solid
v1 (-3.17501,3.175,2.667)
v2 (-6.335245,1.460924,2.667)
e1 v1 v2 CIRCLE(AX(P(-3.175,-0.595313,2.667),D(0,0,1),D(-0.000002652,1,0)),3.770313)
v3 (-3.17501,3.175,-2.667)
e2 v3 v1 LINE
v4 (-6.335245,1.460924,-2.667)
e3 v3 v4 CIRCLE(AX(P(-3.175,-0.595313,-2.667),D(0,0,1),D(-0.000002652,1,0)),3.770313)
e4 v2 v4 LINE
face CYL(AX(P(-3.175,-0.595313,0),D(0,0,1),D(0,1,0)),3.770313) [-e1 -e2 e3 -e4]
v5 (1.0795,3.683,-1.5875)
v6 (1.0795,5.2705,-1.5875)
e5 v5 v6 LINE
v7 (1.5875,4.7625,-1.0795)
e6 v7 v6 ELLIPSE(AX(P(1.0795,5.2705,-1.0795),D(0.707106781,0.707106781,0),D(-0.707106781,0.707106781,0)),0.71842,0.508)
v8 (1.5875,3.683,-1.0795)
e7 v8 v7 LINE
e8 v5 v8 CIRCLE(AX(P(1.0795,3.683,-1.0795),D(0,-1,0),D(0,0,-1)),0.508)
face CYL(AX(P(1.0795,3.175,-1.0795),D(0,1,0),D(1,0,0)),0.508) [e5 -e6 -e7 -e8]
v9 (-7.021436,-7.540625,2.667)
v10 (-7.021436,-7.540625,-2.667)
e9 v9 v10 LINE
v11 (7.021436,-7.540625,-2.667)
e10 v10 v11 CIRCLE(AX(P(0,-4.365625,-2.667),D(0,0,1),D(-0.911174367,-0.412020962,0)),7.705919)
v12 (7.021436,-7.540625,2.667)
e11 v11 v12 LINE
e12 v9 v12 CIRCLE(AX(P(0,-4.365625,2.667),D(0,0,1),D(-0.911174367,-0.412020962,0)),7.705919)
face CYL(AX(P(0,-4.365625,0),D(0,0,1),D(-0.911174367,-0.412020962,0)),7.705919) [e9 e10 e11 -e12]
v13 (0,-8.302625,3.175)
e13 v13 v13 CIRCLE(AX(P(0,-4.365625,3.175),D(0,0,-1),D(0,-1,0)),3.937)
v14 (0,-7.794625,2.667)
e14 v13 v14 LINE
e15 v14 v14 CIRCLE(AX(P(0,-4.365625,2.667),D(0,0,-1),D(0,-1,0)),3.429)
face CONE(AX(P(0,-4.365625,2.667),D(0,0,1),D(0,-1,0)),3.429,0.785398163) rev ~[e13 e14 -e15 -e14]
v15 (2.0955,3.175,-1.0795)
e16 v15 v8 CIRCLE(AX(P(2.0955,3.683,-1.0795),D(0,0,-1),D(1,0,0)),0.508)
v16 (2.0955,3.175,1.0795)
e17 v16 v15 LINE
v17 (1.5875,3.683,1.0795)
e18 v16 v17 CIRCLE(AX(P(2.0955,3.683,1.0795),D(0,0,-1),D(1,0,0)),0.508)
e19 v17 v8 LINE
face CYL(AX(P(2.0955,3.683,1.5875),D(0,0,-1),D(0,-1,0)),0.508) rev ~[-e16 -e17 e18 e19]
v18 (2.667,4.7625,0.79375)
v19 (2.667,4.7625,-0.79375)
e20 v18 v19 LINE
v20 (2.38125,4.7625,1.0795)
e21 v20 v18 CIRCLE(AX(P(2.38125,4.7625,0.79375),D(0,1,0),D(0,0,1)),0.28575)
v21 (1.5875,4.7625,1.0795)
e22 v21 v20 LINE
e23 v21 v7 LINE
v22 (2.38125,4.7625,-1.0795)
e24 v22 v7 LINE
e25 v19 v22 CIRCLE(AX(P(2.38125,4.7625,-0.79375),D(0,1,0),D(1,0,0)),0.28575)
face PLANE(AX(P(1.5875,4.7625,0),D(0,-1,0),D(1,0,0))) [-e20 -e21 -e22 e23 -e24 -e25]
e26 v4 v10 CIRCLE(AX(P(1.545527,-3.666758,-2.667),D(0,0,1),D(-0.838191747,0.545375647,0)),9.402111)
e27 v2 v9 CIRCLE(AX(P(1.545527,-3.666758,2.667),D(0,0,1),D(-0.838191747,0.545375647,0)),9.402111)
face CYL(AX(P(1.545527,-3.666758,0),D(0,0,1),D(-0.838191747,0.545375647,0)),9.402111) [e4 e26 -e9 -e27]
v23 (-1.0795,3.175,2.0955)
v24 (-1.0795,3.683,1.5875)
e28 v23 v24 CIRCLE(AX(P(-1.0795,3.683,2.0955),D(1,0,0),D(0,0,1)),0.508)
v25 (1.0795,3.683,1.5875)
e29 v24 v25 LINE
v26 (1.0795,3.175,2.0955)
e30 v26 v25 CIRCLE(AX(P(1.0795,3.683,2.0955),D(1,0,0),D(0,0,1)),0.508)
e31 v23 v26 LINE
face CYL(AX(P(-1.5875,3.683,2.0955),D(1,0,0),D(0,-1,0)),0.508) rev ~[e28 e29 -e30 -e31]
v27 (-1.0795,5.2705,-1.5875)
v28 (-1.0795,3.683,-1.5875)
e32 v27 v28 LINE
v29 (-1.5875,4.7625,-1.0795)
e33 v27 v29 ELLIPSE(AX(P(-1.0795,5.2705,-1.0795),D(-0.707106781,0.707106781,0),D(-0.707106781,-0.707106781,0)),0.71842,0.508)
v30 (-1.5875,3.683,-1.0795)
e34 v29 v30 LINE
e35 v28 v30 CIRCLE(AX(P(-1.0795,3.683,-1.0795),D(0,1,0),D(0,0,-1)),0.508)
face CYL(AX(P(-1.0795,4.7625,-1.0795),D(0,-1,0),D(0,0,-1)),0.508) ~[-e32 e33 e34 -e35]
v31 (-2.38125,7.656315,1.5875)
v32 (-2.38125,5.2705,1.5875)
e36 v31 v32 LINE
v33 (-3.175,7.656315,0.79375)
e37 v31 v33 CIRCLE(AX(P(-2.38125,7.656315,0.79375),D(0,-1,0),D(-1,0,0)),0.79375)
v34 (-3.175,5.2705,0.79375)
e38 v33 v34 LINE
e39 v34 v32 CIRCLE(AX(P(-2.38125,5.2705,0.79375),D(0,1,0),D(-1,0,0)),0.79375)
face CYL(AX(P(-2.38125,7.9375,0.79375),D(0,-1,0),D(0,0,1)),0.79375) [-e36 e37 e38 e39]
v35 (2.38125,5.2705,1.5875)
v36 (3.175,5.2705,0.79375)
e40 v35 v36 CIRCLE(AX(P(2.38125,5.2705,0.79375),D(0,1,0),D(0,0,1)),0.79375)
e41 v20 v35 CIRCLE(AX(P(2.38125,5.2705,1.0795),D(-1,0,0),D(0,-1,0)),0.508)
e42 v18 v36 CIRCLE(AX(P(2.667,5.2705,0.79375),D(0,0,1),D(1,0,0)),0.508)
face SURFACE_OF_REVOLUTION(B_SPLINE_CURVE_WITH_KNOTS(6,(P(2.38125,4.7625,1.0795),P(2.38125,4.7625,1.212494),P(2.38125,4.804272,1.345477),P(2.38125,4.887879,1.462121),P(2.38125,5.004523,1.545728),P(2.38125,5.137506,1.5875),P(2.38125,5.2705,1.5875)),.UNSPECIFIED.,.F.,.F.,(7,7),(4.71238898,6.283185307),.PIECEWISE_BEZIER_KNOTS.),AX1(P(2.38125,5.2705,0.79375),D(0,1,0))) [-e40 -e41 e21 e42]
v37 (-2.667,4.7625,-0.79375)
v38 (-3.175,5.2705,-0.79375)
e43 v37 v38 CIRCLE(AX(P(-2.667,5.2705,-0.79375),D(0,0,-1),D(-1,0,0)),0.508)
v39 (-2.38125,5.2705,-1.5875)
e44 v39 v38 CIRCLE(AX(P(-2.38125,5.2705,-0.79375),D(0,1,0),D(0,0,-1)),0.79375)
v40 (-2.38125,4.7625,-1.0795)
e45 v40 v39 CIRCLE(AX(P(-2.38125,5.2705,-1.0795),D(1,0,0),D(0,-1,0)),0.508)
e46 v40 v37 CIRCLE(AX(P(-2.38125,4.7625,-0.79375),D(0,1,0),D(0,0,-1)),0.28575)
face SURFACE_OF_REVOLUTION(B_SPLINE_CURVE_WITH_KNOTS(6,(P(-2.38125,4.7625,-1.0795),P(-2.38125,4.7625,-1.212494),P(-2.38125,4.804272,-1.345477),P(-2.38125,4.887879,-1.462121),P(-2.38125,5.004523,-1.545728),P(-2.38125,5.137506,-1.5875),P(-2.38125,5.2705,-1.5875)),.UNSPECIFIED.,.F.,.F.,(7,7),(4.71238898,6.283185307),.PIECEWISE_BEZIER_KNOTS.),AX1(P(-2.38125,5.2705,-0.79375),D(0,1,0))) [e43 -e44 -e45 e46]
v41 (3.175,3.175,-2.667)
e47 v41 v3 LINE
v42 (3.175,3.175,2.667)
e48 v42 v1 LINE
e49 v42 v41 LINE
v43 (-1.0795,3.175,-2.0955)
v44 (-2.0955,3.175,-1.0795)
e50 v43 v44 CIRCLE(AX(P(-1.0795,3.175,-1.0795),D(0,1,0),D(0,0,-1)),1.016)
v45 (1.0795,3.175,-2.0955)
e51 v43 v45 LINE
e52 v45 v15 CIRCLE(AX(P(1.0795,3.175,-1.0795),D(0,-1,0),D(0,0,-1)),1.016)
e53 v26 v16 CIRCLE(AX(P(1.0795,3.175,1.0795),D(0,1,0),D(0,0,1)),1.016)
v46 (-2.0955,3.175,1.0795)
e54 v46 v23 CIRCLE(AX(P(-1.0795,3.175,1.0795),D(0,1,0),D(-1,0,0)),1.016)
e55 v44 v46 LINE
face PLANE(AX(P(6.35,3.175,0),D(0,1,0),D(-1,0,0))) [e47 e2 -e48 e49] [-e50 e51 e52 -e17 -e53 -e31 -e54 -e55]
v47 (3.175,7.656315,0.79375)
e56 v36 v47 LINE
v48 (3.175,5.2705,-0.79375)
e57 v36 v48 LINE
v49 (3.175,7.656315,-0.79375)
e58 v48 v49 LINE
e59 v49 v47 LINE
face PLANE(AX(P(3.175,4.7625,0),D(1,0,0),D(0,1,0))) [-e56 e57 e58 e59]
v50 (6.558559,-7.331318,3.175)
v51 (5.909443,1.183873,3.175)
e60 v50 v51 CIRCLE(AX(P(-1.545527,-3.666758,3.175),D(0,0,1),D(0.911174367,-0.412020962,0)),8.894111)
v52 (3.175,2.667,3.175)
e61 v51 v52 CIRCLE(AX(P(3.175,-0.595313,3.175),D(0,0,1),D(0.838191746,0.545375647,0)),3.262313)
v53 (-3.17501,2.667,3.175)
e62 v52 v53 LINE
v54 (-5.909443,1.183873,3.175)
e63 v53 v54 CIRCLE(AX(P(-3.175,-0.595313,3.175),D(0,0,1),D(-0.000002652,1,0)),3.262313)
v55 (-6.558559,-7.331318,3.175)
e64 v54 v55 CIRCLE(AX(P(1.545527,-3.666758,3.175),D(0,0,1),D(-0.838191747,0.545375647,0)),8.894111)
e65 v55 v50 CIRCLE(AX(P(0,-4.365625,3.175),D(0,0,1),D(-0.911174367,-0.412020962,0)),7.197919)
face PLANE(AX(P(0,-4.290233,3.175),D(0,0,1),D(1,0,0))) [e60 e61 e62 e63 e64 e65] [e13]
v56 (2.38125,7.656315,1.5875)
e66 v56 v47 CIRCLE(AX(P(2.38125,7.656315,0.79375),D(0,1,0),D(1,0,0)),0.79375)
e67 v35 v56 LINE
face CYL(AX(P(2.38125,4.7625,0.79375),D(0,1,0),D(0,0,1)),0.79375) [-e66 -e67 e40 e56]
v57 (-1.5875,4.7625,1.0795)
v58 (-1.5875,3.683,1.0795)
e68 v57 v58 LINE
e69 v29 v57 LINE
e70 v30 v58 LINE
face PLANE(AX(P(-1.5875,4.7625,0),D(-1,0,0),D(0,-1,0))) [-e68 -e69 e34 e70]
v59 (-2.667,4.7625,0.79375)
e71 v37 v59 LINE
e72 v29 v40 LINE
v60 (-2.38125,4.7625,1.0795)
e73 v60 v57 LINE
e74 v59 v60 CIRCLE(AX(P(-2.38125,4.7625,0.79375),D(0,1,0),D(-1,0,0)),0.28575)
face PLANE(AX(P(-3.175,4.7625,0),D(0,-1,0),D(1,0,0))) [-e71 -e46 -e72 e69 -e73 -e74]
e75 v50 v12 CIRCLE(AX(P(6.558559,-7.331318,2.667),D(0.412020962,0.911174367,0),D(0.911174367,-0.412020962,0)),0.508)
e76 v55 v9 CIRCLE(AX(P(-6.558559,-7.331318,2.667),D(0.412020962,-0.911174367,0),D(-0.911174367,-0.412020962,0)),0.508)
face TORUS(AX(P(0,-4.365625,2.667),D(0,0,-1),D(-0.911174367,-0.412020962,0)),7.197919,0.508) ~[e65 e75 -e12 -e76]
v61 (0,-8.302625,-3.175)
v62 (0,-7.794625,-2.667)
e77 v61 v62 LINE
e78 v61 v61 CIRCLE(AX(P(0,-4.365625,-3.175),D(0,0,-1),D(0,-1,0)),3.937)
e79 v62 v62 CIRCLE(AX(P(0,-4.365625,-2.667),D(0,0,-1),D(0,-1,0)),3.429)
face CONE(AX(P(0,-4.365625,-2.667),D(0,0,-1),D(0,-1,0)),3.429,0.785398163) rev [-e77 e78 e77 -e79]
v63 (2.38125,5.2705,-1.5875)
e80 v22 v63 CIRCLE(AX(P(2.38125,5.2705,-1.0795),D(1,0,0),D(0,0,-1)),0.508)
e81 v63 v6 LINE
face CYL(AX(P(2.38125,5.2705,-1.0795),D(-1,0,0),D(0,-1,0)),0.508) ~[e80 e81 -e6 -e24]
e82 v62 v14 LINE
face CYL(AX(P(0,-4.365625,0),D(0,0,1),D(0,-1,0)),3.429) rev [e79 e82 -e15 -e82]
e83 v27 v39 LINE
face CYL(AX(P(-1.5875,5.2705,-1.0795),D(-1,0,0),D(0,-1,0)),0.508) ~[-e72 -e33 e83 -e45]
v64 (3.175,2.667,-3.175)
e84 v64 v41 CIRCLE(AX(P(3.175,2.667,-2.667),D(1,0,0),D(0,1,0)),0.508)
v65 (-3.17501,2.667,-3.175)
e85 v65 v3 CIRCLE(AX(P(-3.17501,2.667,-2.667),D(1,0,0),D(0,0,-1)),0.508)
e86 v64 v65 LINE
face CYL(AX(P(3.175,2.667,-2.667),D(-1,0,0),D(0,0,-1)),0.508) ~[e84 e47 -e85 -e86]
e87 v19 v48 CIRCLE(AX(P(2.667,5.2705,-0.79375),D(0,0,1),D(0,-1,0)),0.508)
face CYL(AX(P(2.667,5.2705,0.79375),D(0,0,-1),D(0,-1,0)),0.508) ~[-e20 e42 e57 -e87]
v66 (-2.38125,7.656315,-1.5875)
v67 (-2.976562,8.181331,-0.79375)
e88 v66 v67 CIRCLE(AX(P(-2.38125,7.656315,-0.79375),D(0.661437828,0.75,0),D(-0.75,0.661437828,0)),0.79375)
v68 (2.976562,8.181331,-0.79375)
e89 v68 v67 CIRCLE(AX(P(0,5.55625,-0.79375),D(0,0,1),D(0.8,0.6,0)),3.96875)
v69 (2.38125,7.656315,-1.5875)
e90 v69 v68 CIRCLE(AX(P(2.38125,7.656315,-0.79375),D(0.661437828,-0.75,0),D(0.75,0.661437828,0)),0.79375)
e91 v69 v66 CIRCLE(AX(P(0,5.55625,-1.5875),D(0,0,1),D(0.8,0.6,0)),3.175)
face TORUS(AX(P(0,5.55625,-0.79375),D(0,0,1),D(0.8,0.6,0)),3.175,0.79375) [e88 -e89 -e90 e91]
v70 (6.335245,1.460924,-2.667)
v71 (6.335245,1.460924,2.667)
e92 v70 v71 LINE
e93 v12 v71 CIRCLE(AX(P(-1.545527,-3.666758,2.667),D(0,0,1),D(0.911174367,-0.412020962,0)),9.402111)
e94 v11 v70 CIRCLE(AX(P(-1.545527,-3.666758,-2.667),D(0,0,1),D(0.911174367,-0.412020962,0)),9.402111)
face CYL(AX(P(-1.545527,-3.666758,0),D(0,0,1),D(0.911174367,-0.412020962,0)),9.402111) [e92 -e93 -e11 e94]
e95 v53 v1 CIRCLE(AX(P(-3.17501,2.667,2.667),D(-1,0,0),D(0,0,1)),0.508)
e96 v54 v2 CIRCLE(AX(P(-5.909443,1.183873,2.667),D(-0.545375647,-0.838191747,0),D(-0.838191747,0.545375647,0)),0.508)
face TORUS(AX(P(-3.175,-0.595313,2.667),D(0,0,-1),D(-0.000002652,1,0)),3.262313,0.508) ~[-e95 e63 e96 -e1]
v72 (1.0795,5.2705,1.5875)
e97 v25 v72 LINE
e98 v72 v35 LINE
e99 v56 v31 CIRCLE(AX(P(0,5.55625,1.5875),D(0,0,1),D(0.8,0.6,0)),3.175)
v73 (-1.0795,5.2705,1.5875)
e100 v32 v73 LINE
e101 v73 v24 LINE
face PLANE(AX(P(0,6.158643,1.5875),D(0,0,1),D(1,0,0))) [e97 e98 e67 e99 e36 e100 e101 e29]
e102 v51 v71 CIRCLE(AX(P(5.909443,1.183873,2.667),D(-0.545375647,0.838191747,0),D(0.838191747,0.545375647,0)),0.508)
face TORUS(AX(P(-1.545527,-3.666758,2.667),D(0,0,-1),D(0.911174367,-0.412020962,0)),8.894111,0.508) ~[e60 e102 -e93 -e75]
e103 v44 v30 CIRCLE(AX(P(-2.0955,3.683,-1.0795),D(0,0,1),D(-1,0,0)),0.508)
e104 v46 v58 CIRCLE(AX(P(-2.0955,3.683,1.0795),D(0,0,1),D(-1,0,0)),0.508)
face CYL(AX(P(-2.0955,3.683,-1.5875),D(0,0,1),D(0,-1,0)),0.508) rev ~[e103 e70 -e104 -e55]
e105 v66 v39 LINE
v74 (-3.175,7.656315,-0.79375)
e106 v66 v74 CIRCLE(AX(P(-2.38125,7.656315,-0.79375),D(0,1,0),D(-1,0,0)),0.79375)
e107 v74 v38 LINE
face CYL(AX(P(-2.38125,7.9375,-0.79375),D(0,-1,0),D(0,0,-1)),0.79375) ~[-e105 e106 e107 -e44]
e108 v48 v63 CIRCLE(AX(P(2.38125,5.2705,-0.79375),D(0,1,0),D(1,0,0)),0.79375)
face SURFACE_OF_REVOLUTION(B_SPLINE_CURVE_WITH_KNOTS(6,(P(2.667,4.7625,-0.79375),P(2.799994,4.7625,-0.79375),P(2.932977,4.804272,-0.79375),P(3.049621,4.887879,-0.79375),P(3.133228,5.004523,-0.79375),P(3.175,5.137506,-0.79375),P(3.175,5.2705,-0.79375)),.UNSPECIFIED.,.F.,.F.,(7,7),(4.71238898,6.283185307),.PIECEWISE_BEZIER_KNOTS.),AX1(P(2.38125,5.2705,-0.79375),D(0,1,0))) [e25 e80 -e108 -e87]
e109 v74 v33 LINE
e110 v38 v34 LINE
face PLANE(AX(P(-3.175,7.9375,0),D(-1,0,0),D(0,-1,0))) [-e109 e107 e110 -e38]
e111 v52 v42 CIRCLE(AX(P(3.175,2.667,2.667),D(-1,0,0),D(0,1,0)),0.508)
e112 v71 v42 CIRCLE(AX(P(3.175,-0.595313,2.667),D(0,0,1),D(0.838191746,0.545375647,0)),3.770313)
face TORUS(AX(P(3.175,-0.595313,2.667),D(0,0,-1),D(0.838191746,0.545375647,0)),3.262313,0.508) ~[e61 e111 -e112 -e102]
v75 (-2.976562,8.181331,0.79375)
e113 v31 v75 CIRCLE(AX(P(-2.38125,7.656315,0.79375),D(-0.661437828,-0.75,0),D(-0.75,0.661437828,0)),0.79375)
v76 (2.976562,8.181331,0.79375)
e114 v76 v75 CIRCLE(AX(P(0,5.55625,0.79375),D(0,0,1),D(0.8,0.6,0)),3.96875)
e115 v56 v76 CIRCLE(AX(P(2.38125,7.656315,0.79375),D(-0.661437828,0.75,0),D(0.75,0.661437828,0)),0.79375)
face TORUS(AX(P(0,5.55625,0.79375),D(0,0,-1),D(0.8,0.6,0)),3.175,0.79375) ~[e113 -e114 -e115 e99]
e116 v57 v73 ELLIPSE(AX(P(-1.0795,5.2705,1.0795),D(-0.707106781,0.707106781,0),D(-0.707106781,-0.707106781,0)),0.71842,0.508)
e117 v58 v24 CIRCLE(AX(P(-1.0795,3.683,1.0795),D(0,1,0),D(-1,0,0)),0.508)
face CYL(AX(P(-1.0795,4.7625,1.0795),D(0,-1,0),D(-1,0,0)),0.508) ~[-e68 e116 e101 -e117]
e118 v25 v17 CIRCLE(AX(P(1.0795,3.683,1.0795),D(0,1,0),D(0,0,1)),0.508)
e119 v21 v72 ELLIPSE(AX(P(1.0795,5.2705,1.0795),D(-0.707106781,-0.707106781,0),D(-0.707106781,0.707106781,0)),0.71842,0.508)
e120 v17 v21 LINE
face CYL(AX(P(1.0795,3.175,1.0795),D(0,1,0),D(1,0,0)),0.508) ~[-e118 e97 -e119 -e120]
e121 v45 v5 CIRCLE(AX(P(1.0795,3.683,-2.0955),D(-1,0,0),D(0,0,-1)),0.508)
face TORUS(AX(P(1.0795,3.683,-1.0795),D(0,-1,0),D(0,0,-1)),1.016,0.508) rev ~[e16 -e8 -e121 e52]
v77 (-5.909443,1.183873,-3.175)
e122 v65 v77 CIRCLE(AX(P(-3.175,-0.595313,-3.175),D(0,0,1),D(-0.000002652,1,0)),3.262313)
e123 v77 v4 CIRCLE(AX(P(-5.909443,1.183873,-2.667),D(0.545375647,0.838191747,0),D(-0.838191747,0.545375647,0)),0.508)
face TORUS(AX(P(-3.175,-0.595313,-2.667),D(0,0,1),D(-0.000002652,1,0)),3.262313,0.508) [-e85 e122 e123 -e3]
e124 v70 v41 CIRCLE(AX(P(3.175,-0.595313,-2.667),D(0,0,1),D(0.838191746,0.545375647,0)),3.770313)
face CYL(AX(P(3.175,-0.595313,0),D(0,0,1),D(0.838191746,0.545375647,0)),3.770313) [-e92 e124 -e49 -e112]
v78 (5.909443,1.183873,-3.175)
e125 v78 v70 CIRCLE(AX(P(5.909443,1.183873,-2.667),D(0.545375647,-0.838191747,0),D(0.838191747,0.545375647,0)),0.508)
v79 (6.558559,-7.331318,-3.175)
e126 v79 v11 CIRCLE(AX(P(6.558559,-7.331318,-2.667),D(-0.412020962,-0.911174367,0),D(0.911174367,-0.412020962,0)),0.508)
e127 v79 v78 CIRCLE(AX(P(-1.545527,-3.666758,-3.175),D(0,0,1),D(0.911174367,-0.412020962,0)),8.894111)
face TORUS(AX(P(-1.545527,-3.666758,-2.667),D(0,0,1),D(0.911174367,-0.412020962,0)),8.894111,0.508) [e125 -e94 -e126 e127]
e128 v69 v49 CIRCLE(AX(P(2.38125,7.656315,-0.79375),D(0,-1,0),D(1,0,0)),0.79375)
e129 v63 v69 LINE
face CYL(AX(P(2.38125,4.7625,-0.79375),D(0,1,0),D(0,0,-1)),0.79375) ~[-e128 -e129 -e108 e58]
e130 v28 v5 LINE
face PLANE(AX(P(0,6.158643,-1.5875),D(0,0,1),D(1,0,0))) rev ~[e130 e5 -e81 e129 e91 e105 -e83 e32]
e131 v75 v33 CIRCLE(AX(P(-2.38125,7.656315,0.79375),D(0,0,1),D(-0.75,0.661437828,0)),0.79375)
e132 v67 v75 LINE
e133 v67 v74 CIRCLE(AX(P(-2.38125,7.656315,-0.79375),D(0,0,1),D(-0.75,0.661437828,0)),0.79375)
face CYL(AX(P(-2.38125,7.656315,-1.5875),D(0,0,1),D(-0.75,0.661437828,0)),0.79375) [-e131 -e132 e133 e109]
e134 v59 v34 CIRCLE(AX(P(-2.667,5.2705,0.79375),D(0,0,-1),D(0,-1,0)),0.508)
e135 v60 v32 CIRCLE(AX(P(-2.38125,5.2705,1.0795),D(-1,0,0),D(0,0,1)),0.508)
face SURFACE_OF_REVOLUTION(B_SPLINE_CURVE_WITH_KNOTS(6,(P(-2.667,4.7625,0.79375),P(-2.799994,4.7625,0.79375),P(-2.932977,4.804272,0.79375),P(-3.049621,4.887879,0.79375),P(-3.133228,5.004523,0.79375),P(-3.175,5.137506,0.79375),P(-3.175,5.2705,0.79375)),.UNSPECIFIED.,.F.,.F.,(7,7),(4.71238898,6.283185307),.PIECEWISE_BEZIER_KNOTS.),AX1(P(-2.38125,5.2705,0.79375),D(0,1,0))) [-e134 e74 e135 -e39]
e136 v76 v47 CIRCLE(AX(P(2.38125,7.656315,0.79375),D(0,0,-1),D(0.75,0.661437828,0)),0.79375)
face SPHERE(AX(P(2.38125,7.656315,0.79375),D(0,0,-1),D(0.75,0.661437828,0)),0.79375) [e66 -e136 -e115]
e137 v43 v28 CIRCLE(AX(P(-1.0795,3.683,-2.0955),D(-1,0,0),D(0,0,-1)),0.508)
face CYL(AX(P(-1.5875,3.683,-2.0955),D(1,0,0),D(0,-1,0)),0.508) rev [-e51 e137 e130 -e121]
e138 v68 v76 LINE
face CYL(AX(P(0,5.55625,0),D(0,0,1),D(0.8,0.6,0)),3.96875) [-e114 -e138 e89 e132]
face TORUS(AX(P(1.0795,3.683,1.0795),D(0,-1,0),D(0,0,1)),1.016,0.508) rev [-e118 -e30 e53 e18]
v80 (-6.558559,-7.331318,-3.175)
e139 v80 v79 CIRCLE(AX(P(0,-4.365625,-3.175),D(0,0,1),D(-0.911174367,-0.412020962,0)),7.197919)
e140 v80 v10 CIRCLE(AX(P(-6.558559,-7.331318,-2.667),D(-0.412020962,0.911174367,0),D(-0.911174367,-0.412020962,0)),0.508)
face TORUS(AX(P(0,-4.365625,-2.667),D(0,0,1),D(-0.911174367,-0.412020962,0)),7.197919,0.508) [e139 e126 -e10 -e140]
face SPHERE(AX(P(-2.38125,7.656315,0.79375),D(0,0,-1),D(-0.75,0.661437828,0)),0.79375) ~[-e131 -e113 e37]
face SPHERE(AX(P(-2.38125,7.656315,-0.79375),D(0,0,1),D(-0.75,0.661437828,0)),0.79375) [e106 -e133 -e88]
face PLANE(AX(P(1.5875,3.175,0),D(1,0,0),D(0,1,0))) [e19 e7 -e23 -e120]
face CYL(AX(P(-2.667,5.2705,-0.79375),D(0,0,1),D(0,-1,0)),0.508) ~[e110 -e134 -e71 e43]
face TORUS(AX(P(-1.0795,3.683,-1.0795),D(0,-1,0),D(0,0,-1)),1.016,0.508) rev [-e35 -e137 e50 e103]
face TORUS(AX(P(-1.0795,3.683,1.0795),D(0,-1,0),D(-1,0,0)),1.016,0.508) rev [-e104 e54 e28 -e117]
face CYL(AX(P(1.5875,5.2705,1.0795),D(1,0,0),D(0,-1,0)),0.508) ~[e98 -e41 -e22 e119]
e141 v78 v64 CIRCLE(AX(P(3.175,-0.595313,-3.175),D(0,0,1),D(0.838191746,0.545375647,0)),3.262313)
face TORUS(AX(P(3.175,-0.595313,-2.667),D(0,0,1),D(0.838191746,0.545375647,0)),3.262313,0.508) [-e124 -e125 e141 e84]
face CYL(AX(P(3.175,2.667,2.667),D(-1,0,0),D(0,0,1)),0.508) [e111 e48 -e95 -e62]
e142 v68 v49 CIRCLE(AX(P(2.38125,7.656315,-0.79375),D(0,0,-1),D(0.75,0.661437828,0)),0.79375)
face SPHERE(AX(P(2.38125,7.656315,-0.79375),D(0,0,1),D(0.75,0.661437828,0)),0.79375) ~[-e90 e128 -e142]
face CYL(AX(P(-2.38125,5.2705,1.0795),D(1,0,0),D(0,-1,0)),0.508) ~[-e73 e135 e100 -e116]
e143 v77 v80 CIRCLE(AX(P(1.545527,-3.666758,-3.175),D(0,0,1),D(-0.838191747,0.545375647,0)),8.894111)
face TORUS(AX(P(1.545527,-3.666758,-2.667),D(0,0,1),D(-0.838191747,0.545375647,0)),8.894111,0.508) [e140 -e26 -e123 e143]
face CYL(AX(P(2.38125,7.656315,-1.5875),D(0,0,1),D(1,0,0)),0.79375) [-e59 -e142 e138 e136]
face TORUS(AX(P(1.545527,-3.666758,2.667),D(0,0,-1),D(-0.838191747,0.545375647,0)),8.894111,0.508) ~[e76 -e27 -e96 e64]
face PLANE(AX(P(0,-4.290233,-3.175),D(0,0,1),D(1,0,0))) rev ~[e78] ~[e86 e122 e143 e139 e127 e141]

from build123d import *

# Parameters (mm, degrees)
F1_DEPTH = 1.5875
F2_DEPTH = 3.175
F3_R     = 3.17499
F4_R     = 0.79375
F6_DEPTH = 3.175
F7_R     = 0.508
F8_R     = 0.508
F9_SIZE  = 0.508


# Not quite as in the source:
# - a fillet or chamfer is up to 0.001 mm smaller than in the source, because OpenCascade refuses the exact size
# - a feature names something its author has since deleted; it is built from what else it names


with BuildPart() as f1:
    # F0 (on Top) → F1 (new body, symmetric)
    with BuildSketch(Plane.XY):
        with BuildLine():
            Line((3.175, 4.7625), (3.175, 7.9375))
            ThreePointArc((3.175, 7.9375), (0, 9.525), (-3.175, 7.9375))
            Line((-3.175, 7.9375), (-3.175, 4.7625))
            Line((-3.175, 4.7625), (-1.5875, 4.7625))
            Line((-1.5875, 4.7625), (-1.5875, 3.175))
            Line((-1.5875, 3.175), (1.5875, 3.175))
            Line((1.5875, 3.175), (1.5875, 4.7625))
            Line((1.5875, 4.7625), (3.175, 4.7625))
        make_face()
    extrude(amount=F1_DEPTH, both=True)

    # F0 (on Top) → F2 (join, symmetric)
    with BuildSketch(Plane.XY):
        Polygon((6.35, 3.175), (1.5875, 3.175), (-1.5875, 3.175), (-6.35, 3.175), (-6.35, 0), (6.35, 0), align=None)
    extrude(amount=F2_DEPTH, both=True)

    # F3 (radius 3.175 in the source; OpenCascade refuses exactly that, so slightly less here)
    f3_edges = [f1.edges().sort_by_distance(p)[0] for p in [
        (6.35, 3.175, 0),
        (-6.35, 3.175, 0),
    ]]
    fillet(f3_edges, radius=F3_R)

    # F4
    f4_edges = [f1.edges().sort_by_distance(p)[0] for p in [
        (0, 9.525, -1.5875),
        (0, 9.525, 1.5875),
        (3.175, 6.35, -1.5875),
        (3.175, 6.35, 1.5875),
        (-3.175, 6.35, -1.5875),
        (-3.175, 6.35, 1.5875),
        (3.175, 7.9375, 0),
        (-3.175, 7.9375, 0),
    ]]
    fillet(f4_edges, radius=F4_R)

    # F5 (on Top) → F6 (join, symmetric)
    with BuildSketch(Plane.XY):
        with BuildLine():
            Line((1.5875, 3.175), (-1.5875, 3.175))
            ThreePointArc((-1.5875, 3.175), (-6.8727430801, -0.8804299989), (-7.0214355114, -7.540625))
            ThreePointArc((-7.0214355114, -7.540625), (0, -12.0715436111), (7.0214355114, -7.540625))
            ThreePointArc((7.0214355114, -7.540625), (6.8727430801, -0.8804299989), (1.5875, 3.175))
        make_face()
        with BuildLine():
            ThreePointArc((0, -0.936625), (3.429, -4.365625), (0, -7.794625))
            ThreePointArc((0, -7.794625), (-3.429, -4.365625), (0, -0.936625))
        make_face(mode=Mode.SUBTRACT)
        with BuildLine():
            Line((3.175, 3.175), (1.5875, 3.175))
            ThreePointArc((1.5875, 3.175), (6.8727430801, -0.8804299989), (7.0214355114, -7.540625))
            ThreePointArc((7.0214355114, -7.540625), (7.829384353, -2.9521060097), (6.3352448193, 1.4609241182))
            ThreePointArc((6.3352448193, 1.4609241182), (4.9725819485, 2.7188926062), (3.175, 3.175))
        make_face()
        with BuildLine():
            Line((-1.5875, 3.175), (-3.175, 3.175))
            ThreePointArc((-3.175, 3.175), (-4.9725819485, 2.7188926062), (-6.3352448193, 1.4609241182))
            ThreePointArc((-6.3352448193, 1.4609241182), (-7.829384353, -2.9521060097), (-7.0214355114, -7.540625))
            ThreePointArc((-7.0214355114, -7.540625), (-6.8727430801, -0.8804299989), (-1.5875, 3.175))
        make_face()
    extrude(amount=F6_DEPTH, both=True)

    # F7
    f7_edges = [f1.edges().sort_by_distance(p)[0] for p in [
        (0, 3.175, -1.5875),
        (-1.5875, 3.175, 0),
        (0, 3.175, 1.5875),
        (1.5875, 3.175, 0),
        (1.5875, 3.96875, 1.5875),
        (1.5875, 3.96875, -1.5875),
        (-1.5875, 3.96875, -1.5875),
        (-1.5875, 3.96875, 1.5875),
        (2.942516, 4.7625, 1.355016),
        (-2.942516, 4.7625, -1.355016),
    ]]
    fillet(f7_edges, radius=F7_R)

    # F8
    f8_edges = [f1.edges().sort_by_distance(p)[0] for p in [
        (-7.829384, -2.952106, -3.175),
        (-7.829384, -2.952106, 3.175),
        (0, 3.175, -3.175),
        (0, 3.175, 3.175),
        (-4.972586, 2.71889, -3.175),
        (0, -12.071544, -3.175),
        (7.829384, -2.952106, -3.175),
        (4.972586, 2.71889, -3.175),
        (4.972586, 2.71889, 3.175),
        (-4.972586, 2.71889, 3.175),
        (0, -12.071544, 3.175),
        (7.829384, -2.952106, 3.175),
    ]]
    fillet(f8_edges, radius=F8_R)

    # F9
    f9_edges = [f1.edges().sort_by_distance(p)[0] for p in [
        (0, -0.936625, 3.175),
        (0, -0.936625, -3.175),
    ]]
    chamfer(f9_edges, length=F9_SIZE)


solid = f1.part
